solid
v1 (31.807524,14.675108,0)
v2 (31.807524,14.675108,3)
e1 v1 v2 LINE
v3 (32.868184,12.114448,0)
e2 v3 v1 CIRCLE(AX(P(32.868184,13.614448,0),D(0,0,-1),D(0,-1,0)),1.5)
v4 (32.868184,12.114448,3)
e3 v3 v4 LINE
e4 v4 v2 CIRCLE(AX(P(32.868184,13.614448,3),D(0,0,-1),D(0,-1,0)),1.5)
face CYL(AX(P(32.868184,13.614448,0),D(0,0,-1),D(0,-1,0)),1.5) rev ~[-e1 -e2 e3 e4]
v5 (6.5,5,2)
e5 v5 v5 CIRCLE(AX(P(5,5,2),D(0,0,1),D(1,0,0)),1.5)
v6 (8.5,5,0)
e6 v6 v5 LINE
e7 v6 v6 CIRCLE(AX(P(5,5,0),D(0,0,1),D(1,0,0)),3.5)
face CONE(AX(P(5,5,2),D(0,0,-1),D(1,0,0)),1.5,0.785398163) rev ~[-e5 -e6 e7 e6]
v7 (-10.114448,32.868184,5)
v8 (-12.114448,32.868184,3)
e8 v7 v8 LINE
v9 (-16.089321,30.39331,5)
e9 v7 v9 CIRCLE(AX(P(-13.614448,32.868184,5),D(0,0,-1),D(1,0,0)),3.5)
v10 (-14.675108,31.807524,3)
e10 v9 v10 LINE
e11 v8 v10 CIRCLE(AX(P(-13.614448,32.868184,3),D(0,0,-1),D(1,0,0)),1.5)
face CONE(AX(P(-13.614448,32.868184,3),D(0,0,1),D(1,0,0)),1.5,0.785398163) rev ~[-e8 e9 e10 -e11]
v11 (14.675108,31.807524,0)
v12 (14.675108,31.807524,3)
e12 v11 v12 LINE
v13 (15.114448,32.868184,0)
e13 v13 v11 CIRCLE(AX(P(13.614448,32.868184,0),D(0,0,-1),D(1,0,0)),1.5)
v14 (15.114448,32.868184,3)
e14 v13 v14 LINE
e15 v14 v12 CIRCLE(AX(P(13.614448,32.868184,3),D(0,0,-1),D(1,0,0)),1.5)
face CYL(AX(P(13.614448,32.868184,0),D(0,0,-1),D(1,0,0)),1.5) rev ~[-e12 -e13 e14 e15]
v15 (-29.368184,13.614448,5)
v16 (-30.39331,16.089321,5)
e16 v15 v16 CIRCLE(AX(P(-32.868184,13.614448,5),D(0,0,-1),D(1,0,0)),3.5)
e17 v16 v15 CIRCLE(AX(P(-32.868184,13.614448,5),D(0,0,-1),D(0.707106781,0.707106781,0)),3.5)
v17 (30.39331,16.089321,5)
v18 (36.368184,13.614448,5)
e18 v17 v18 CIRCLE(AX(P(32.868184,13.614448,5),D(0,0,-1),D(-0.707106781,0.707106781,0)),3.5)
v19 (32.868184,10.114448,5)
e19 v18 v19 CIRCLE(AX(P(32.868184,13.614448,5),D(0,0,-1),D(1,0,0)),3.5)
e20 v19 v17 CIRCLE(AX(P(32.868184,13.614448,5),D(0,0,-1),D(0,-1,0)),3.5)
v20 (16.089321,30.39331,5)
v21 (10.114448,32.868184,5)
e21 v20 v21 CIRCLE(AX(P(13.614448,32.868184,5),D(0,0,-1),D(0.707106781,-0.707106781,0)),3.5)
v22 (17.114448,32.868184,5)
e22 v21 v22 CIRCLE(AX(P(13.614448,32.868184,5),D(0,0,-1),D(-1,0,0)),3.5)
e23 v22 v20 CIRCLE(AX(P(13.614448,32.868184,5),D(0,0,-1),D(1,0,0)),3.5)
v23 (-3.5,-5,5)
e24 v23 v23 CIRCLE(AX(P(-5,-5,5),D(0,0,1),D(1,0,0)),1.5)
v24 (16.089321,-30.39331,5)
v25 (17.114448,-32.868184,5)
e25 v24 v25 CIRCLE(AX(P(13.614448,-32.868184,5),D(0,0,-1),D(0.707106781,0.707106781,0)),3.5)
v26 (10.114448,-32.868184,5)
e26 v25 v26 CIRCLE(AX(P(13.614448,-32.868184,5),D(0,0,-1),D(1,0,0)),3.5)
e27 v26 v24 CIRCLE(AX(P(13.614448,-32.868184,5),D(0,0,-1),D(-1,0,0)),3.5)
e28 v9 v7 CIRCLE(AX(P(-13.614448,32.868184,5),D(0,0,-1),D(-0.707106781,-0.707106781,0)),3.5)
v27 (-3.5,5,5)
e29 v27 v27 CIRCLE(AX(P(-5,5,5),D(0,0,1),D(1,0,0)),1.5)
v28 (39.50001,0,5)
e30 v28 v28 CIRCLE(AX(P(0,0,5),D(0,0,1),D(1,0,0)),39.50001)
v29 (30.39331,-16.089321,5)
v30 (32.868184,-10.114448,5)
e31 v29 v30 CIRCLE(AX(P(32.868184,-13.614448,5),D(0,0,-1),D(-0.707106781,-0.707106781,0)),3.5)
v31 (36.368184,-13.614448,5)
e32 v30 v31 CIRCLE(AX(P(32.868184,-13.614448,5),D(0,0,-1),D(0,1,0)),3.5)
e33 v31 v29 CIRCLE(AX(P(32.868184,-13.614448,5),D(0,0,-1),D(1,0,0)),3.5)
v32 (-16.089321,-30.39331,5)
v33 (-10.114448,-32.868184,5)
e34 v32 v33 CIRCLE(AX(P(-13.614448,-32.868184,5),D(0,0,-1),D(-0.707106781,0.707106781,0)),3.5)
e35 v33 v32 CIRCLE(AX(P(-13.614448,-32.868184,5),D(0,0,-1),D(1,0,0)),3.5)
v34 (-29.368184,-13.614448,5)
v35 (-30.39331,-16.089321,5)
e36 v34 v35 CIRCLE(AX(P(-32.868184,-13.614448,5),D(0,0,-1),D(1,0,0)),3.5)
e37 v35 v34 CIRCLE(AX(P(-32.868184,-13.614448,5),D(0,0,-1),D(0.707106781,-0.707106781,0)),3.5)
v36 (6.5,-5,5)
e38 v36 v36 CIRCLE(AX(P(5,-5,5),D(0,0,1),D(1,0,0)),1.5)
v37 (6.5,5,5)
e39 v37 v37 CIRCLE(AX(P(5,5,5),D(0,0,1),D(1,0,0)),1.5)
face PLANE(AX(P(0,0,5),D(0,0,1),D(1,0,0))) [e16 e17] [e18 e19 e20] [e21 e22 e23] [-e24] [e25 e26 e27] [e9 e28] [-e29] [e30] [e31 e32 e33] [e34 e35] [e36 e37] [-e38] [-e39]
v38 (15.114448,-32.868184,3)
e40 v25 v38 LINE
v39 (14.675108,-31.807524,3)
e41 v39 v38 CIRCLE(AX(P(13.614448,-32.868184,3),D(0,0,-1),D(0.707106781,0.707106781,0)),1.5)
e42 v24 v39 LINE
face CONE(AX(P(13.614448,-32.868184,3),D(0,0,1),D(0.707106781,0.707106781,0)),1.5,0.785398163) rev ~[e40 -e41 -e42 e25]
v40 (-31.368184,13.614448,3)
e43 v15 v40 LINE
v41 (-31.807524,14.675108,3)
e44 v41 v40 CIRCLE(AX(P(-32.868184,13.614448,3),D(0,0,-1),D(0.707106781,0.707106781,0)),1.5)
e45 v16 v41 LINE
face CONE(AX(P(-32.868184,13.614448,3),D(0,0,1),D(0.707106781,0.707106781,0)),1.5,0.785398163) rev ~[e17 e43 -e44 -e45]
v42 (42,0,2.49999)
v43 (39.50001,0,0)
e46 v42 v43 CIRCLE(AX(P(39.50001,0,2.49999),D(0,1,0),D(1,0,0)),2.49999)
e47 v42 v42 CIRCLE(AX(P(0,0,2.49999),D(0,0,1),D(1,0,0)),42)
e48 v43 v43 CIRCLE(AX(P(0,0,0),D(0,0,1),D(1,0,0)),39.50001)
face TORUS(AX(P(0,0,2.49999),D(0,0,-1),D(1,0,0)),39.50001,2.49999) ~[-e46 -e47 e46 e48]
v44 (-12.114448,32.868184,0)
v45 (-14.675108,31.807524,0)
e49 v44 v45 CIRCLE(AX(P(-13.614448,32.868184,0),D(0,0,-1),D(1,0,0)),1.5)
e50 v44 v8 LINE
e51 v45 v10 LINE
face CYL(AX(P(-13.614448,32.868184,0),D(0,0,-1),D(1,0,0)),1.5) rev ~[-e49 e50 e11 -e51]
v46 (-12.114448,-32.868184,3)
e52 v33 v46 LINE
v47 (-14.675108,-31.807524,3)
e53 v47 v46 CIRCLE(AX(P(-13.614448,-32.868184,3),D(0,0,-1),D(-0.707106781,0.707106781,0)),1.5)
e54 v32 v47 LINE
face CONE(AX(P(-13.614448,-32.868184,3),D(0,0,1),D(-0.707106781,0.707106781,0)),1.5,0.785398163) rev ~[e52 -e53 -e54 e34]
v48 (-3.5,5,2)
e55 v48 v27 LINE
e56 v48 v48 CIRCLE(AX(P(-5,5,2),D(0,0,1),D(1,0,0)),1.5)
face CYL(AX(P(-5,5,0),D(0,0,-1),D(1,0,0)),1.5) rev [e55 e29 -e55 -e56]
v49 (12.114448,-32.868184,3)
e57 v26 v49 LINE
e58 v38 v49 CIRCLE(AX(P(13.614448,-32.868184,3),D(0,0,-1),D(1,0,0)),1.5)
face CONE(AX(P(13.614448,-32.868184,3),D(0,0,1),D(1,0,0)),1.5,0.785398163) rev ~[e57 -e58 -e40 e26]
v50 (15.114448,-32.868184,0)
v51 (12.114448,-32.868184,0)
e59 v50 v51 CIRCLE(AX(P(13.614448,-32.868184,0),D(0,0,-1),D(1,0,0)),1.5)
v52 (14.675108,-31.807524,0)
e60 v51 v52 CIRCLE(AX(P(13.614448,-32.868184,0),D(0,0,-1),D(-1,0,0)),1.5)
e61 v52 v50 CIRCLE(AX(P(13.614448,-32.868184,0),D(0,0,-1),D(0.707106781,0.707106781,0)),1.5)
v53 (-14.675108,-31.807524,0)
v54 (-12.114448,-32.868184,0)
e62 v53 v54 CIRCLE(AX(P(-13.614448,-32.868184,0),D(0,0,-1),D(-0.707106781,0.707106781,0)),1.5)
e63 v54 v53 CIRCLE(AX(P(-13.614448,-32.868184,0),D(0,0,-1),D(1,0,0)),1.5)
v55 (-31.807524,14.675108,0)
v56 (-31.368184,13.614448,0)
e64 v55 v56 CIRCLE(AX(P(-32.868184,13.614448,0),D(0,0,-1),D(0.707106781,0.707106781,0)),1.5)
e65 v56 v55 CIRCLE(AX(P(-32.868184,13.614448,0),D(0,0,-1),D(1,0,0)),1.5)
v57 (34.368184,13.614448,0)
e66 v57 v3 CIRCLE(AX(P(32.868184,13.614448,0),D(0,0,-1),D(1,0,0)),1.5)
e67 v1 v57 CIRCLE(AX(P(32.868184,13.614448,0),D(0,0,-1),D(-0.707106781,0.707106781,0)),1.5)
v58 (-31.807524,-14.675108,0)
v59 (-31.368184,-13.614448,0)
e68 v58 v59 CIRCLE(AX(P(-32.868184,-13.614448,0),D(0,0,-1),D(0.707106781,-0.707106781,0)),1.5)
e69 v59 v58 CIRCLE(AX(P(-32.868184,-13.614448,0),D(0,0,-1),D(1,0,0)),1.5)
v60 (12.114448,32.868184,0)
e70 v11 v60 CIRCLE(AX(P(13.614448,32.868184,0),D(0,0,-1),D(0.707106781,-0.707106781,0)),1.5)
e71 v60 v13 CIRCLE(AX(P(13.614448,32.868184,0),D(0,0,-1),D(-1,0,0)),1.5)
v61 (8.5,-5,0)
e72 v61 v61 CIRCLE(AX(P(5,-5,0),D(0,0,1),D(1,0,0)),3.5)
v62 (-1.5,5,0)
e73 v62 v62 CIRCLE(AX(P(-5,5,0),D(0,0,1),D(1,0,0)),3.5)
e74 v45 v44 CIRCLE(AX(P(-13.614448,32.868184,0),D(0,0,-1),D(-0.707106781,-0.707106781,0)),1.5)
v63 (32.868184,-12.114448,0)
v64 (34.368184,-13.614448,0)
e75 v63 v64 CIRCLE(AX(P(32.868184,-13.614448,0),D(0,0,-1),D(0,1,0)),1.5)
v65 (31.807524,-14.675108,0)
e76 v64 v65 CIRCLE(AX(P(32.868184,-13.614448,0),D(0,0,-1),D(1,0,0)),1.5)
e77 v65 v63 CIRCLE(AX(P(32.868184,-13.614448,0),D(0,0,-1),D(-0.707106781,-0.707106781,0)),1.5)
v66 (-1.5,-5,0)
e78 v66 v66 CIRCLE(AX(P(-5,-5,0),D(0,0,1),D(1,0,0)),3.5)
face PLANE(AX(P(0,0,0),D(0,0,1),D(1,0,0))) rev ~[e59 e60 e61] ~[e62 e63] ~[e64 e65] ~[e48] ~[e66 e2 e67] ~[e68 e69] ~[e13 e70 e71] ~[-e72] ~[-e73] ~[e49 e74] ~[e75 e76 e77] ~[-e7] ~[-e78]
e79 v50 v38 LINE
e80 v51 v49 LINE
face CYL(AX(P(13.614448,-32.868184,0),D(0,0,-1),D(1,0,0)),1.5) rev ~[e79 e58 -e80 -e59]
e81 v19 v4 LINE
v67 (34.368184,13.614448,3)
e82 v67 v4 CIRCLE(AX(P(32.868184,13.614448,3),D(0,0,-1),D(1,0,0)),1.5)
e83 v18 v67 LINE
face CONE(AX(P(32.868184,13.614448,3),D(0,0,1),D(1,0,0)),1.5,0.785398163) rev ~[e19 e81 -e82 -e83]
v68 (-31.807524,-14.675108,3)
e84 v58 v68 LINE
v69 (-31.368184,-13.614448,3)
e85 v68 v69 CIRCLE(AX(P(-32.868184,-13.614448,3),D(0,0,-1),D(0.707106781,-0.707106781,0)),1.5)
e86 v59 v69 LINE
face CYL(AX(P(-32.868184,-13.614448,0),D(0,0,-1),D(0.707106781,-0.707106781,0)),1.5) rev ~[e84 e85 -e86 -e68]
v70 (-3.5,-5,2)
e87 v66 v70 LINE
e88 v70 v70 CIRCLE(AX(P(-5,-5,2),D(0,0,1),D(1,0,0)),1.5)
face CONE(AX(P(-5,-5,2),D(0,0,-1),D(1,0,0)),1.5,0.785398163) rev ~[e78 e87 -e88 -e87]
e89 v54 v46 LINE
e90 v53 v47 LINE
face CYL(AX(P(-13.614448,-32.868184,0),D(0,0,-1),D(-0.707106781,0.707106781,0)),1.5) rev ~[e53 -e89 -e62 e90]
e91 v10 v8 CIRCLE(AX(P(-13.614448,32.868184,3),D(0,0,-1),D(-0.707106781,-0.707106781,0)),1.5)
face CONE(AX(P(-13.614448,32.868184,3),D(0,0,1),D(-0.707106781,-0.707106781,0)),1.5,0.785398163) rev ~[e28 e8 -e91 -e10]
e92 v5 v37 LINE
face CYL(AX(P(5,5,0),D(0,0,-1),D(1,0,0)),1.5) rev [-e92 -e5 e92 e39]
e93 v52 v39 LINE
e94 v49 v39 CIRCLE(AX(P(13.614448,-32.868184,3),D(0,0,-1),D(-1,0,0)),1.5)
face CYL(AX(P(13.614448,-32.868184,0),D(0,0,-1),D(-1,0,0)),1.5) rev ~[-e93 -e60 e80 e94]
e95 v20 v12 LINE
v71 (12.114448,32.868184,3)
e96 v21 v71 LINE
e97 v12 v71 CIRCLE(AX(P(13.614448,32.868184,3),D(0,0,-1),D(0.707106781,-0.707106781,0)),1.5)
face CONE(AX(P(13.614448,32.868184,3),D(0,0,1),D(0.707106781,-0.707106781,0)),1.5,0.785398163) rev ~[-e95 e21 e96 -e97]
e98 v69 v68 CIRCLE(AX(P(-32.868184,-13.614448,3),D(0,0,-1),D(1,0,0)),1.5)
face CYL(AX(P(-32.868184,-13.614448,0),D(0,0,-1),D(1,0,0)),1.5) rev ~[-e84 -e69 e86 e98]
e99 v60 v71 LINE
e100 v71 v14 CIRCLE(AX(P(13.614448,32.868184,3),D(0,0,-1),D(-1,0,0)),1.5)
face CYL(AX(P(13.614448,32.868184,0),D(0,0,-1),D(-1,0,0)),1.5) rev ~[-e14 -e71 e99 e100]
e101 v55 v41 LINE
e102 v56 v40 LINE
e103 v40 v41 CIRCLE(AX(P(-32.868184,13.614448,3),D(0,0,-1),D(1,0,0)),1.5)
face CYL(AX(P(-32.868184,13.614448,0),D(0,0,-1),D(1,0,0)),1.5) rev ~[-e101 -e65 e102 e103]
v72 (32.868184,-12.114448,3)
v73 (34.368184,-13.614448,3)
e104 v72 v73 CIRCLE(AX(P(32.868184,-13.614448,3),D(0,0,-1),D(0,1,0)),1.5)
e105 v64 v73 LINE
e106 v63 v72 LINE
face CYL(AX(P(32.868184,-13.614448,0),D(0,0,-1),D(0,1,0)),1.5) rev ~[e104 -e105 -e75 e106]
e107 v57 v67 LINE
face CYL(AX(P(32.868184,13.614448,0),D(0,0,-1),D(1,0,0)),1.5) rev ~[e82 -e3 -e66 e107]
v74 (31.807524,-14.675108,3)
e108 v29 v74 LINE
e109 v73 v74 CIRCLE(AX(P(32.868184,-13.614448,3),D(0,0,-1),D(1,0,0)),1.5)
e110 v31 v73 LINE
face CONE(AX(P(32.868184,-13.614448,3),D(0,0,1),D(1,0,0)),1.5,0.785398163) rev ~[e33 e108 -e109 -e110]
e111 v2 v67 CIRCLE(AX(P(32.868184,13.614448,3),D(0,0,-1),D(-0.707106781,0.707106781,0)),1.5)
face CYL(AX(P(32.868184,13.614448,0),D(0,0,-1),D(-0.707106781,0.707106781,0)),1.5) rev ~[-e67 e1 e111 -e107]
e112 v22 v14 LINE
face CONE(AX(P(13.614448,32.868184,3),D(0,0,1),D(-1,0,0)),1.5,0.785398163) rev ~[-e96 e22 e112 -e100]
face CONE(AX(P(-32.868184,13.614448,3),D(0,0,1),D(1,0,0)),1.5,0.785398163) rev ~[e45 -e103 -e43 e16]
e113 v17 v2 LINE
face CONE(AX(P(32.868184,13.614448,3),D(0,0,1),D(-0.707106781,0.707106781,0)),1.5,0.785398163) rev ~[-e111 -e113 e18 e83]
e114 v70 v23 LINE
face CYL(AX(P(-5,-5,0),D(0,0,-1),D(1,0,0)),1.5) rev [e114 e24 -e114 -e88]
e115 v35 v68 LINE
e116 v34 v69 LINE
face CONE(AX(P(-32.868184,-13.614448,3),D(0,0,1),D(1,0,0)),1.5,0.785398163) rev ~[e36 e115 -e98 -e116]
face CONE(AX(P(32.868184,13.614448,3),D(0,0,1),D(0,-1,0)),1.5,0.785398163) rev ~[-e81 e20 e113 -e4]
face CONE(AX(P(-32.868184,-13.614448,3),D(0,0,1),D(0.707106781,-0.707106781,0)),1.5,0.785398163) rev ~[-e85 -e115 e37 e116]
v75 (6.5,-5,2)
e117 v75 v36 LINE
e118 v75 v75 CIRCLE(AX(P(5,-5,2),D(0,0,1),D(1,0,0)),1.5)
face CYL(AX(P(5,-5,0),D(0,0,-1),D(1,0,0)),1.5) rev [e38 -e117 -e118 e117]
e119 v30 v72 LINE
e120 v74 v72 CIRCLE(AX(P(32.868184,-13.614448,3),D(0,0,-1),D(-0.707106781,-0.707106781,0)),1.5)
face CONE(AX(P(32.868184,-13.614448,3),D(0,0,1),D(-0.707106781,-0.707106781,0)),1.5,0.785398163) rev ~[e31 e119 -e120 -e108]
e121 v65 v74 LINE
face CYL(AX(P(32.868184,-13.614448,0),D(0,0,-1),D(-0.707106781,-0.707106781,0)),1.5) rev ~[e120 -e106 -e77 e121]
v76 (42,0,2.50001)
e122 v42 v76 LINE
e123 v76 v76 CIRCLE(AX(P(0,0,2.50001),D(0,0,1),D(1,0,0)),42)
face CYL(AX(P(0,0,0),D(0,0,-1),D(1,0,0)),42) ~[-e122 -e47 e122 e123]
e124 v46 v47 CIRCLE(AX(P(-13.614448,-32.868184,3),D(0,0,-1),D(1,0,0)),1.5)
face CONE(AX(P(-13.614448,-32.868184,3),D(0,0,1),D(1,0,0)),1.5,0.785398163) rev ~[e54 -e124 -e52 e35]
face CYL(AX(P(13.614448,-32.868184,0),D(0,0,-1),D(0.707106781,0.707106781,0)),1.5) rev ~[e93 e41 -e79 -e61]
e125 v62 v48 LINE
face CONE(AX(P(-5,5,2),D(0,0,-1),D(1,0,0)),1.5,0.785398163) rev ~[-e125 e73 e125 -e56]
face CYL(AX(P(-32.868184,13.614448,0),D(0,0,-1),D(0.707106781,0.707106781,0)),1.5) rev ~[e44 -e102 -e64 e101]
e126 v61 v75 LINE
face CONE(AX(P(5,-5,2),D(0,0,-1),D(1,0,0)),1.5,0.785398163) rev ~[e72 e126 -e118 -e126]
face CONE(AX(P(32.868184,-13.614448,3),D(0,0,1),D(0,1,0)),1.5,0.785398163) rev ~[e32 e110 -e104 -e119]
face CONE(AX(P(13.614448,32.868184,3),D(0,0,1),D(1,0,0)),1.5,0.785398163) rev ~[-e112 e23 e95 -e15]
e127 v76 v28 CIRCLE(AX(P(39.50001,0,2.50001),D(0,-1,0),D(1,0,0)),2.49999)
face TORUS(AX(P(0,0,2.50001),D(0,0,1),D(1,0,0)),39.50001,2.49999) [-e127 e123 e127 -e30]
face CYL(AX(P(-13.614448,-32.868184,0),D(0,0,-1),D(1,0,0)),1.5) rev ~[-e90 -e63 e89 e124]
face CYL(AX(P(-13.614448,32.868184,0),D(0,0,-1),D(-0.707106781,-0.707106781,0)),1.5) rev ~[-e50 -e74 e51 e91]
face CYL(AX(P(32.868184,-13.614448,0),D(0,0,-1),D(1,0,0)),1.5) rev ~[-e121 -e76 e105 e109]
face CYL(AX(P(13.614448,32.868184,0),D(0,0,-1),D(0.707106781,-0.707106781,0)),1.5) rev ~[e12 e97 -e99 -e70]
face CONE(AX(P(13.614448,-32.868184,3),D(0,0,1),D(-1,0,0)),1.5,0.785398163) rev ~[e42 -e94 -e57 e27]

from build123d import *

# Parameters (mm, degrees)
F0_R     = 42
F0_R_2   = 1.5
F1_DEPTH = 5
F2_R     = 2.49999
F3_SIZE  = 2


# Not quite as in the source:
# - a fillet or chamfer is up to 0.001 mm smaller than in the source, because OpenCascade refuses the exact size


with BuildPart() as f1:
    # F0 (on Top) → F1 (new body)
    with BuildSketch(Plane.XY):
        Circle(F0_R)
        with BuildLine():
            ThreePointArc((34.3681841493, 13.6144476452), (33.928844321, 12.5537874734), (32.8681841493, 12.1144476452))
            Line((32.8681841493, 12.1144476452), (32.8681841493, -12.1144476452))
            ThreePointArc((32.8681841493, -12.1144476452), (33.928844321, -12.5537874734), (34.3681841493, -13.6144476452))
            ThreePointArc((34.3681841493, -13.6144476452), (33.4422092978, -15.000266944), (31.8075239775, -14.675107817))
            Line((31.8075239775, -14.675107817), (14.675107817, -31.8075239775))
            ThreePointArc((14.675107817, -31.8075239775), (15.000266944, -32.2941590007), (15.1144476452, -32.8681841493))
            ThreePointArc((15.1144476452, -32.8681841493), (13.6144476452, -34.3681841493), (12.1144476452, -32.8681841493))
            Line((12.1144476452, -32.8681841493), (-12.1144476452, -32.8681841493))
            ThreePointArc((-12.1144476452, -32.8681841493), (-14.1884727937, -34.254003448), (-14.675107817, -31.8075239775))
            Line((-14.675107817, -31.8075239775), (-31.8075239775, -14.675107817))
            ThreePointArc((-31.8075239775, -14.675107817), (-34.254003448, -14.1884727937), (-32.8681841493, -12.1144476452))
            Line((-32.8681841493, -12.1144476452), (-32.8681841493, 12.1144476452))
            ThreePointArc((-32.8681841493, 12.1144476452), (-34.254003448, 14.1884727937), (-31.8075239775, 14.675107817))
            Line((-31.8075239775, 14.675107817), (-14.675107817, 31.8075239775))
            ThreePointArc((-14.675107817, 31.8075239775), (-14.1884727937, 34.254003448), (-12.1144476452, 32.8681841493))
            Line((-12.1144476452, 32.8681841493), (12.1144476452, 32.8681841493))
            ThreePointArc((12.1144476452, 32.8681841493), (13.6144476452, 34.3681841493), (15.1144476452, 32.8681841493))
            ThreePointArc((15.1144476452, 32.8681841493), (15.000266944, 32.2941590007), (14.675107817, 31.8075239775))
            Line((14.675107817, 31.8075239775), (31.8075239775, 14.675107817))
            ThreePointArc((31.8075239775, 14.675107817), (33.4422092978, 15.000266944), (34.3681841493, 13.6144476452))
        make_face(mode=Mode.SUBTRACT)
        with BuildLine():
            Line((32.8681841493, -12.1144476452), (32.8681841493, 12.1144476452))
            ThreePointArc((32.8681841493, 12.1144476452), (31.4823648505, 13.0404224967), (31.8075239775, 14.675107817))
            Line((31.8075239775, 14.675107817), (14.675107817, 31.8075239775))
            ThreePointArc((14.675107817, 31.8075239775), (13.0404224967, 31.4823648505), (12.1144476452, 32.8681841493))
            Line((12.1144476452, 32.8681841493), (-12.1144476452, 32.8681841493))
            ThreePointArc((-12.1144476452, 32.8681841493), (-13.0404224967, 31.4823648505), (-14.675107817, 31.8075239775))
            Line((-14.675107817, 31.8075239775), (-31.8075239775, 14.675107817))
            ThreePointArc((-31.8075239775, 14.675107817), (-31.4823648505, 14.1884727937), (-31.3681841493, 13.6144476452))
            ThreePointArc((-31.3681841493, 13.6144476452), (-31.8075239775, 12.5537874734), (-32.8681841493, 12.1144476452))
            Line((-32.8681841493, 12.1144476452), (-32.8681841493, -12.1144476452))
            ThreePointArc((-32.8681841493, -12.1144476452), (-31.8075239775, -12.5537874734), (-31.3681841493, -13.6144476452))
            ThreePointArc((-31.3681841493, -13.6144476452), (-31.4823648505, -14.1884727937), (-31.8075239775, -14.675107817))
            Line((-31.8075239775, -14.675107817), (-14.675107817, -31.8075239775))
            ThreePointArc((-14.675107817, -31.8075239775), (-13.0404224967, -31.4823648505), (-12.1144476452, -32.8681841493))
            Line((-12.1144476452, -32.8681841493), (12.1144476452, -32.8681841493))
            ThreePointArc((12.1144476452, -32.8681841493), (13.0404224967, -31.4823648505), (14.675107817, -31.8075239775))
            Line((14.675107817, -31.8075239775), (31.8075239775, -14.675107817))
            ThreePointArc((31.8075239775, -14.675107817), (31.4823648505, -13.0404224967), (32.8681841493, -12.1144476452))
        make_face()
        with Locations((-5, -5)):
            Circle(F0_R_2, mode=Mode.SUBTRACT)
        with Locations((5, -5)):
            Circle(F0_R_2, mode=Mode.SUBTRACT)
        with Locations((-5, 5)):
            Circle(F0_R_2, mode=Mode.SUBTRACT)
        with Locations((5, 5)):
            Circle(F0_R_2, mode=Mode.SUBTRACT)
    extrude(amount=F1_DEPTH)

    # F2 (radius 2.5 in the source; OpenCascade refuses exactly that, so slightly less here)
    f2_edges = [f1.edges().sort_by_distance(p)[0] for p in [
        (42, 0, 2.5),
        (-42, 0, 0),
        (-42, 0, 5),
    ]]
    fillet(f2_edges, radius=F2_R)

    # F3
    f3_edges = [f1.edges().sort_by_distance(p)[0] for p in [
        (-34.368184, 13.614448, 5),
        (-12.553787, 33.928844, 5),
        (15.114448, 32.868184, 5),
        (33.928844, 12.553787, 5),
        (32.868184, -15.114448, 5),
        (-15.114448, -32.868184, 5),
        (12.553787, -33.928844, 5),
        (-34.368184, -13.614448, 5),
        (-6.5, -5, 0),
        (-6.5, 5, 0),
        (3.5, 5, 0),
        (3.5, -5, 0),
    ]]
    chamfer(f3_edges, length=F3_SIZE)


solid = f1.part
